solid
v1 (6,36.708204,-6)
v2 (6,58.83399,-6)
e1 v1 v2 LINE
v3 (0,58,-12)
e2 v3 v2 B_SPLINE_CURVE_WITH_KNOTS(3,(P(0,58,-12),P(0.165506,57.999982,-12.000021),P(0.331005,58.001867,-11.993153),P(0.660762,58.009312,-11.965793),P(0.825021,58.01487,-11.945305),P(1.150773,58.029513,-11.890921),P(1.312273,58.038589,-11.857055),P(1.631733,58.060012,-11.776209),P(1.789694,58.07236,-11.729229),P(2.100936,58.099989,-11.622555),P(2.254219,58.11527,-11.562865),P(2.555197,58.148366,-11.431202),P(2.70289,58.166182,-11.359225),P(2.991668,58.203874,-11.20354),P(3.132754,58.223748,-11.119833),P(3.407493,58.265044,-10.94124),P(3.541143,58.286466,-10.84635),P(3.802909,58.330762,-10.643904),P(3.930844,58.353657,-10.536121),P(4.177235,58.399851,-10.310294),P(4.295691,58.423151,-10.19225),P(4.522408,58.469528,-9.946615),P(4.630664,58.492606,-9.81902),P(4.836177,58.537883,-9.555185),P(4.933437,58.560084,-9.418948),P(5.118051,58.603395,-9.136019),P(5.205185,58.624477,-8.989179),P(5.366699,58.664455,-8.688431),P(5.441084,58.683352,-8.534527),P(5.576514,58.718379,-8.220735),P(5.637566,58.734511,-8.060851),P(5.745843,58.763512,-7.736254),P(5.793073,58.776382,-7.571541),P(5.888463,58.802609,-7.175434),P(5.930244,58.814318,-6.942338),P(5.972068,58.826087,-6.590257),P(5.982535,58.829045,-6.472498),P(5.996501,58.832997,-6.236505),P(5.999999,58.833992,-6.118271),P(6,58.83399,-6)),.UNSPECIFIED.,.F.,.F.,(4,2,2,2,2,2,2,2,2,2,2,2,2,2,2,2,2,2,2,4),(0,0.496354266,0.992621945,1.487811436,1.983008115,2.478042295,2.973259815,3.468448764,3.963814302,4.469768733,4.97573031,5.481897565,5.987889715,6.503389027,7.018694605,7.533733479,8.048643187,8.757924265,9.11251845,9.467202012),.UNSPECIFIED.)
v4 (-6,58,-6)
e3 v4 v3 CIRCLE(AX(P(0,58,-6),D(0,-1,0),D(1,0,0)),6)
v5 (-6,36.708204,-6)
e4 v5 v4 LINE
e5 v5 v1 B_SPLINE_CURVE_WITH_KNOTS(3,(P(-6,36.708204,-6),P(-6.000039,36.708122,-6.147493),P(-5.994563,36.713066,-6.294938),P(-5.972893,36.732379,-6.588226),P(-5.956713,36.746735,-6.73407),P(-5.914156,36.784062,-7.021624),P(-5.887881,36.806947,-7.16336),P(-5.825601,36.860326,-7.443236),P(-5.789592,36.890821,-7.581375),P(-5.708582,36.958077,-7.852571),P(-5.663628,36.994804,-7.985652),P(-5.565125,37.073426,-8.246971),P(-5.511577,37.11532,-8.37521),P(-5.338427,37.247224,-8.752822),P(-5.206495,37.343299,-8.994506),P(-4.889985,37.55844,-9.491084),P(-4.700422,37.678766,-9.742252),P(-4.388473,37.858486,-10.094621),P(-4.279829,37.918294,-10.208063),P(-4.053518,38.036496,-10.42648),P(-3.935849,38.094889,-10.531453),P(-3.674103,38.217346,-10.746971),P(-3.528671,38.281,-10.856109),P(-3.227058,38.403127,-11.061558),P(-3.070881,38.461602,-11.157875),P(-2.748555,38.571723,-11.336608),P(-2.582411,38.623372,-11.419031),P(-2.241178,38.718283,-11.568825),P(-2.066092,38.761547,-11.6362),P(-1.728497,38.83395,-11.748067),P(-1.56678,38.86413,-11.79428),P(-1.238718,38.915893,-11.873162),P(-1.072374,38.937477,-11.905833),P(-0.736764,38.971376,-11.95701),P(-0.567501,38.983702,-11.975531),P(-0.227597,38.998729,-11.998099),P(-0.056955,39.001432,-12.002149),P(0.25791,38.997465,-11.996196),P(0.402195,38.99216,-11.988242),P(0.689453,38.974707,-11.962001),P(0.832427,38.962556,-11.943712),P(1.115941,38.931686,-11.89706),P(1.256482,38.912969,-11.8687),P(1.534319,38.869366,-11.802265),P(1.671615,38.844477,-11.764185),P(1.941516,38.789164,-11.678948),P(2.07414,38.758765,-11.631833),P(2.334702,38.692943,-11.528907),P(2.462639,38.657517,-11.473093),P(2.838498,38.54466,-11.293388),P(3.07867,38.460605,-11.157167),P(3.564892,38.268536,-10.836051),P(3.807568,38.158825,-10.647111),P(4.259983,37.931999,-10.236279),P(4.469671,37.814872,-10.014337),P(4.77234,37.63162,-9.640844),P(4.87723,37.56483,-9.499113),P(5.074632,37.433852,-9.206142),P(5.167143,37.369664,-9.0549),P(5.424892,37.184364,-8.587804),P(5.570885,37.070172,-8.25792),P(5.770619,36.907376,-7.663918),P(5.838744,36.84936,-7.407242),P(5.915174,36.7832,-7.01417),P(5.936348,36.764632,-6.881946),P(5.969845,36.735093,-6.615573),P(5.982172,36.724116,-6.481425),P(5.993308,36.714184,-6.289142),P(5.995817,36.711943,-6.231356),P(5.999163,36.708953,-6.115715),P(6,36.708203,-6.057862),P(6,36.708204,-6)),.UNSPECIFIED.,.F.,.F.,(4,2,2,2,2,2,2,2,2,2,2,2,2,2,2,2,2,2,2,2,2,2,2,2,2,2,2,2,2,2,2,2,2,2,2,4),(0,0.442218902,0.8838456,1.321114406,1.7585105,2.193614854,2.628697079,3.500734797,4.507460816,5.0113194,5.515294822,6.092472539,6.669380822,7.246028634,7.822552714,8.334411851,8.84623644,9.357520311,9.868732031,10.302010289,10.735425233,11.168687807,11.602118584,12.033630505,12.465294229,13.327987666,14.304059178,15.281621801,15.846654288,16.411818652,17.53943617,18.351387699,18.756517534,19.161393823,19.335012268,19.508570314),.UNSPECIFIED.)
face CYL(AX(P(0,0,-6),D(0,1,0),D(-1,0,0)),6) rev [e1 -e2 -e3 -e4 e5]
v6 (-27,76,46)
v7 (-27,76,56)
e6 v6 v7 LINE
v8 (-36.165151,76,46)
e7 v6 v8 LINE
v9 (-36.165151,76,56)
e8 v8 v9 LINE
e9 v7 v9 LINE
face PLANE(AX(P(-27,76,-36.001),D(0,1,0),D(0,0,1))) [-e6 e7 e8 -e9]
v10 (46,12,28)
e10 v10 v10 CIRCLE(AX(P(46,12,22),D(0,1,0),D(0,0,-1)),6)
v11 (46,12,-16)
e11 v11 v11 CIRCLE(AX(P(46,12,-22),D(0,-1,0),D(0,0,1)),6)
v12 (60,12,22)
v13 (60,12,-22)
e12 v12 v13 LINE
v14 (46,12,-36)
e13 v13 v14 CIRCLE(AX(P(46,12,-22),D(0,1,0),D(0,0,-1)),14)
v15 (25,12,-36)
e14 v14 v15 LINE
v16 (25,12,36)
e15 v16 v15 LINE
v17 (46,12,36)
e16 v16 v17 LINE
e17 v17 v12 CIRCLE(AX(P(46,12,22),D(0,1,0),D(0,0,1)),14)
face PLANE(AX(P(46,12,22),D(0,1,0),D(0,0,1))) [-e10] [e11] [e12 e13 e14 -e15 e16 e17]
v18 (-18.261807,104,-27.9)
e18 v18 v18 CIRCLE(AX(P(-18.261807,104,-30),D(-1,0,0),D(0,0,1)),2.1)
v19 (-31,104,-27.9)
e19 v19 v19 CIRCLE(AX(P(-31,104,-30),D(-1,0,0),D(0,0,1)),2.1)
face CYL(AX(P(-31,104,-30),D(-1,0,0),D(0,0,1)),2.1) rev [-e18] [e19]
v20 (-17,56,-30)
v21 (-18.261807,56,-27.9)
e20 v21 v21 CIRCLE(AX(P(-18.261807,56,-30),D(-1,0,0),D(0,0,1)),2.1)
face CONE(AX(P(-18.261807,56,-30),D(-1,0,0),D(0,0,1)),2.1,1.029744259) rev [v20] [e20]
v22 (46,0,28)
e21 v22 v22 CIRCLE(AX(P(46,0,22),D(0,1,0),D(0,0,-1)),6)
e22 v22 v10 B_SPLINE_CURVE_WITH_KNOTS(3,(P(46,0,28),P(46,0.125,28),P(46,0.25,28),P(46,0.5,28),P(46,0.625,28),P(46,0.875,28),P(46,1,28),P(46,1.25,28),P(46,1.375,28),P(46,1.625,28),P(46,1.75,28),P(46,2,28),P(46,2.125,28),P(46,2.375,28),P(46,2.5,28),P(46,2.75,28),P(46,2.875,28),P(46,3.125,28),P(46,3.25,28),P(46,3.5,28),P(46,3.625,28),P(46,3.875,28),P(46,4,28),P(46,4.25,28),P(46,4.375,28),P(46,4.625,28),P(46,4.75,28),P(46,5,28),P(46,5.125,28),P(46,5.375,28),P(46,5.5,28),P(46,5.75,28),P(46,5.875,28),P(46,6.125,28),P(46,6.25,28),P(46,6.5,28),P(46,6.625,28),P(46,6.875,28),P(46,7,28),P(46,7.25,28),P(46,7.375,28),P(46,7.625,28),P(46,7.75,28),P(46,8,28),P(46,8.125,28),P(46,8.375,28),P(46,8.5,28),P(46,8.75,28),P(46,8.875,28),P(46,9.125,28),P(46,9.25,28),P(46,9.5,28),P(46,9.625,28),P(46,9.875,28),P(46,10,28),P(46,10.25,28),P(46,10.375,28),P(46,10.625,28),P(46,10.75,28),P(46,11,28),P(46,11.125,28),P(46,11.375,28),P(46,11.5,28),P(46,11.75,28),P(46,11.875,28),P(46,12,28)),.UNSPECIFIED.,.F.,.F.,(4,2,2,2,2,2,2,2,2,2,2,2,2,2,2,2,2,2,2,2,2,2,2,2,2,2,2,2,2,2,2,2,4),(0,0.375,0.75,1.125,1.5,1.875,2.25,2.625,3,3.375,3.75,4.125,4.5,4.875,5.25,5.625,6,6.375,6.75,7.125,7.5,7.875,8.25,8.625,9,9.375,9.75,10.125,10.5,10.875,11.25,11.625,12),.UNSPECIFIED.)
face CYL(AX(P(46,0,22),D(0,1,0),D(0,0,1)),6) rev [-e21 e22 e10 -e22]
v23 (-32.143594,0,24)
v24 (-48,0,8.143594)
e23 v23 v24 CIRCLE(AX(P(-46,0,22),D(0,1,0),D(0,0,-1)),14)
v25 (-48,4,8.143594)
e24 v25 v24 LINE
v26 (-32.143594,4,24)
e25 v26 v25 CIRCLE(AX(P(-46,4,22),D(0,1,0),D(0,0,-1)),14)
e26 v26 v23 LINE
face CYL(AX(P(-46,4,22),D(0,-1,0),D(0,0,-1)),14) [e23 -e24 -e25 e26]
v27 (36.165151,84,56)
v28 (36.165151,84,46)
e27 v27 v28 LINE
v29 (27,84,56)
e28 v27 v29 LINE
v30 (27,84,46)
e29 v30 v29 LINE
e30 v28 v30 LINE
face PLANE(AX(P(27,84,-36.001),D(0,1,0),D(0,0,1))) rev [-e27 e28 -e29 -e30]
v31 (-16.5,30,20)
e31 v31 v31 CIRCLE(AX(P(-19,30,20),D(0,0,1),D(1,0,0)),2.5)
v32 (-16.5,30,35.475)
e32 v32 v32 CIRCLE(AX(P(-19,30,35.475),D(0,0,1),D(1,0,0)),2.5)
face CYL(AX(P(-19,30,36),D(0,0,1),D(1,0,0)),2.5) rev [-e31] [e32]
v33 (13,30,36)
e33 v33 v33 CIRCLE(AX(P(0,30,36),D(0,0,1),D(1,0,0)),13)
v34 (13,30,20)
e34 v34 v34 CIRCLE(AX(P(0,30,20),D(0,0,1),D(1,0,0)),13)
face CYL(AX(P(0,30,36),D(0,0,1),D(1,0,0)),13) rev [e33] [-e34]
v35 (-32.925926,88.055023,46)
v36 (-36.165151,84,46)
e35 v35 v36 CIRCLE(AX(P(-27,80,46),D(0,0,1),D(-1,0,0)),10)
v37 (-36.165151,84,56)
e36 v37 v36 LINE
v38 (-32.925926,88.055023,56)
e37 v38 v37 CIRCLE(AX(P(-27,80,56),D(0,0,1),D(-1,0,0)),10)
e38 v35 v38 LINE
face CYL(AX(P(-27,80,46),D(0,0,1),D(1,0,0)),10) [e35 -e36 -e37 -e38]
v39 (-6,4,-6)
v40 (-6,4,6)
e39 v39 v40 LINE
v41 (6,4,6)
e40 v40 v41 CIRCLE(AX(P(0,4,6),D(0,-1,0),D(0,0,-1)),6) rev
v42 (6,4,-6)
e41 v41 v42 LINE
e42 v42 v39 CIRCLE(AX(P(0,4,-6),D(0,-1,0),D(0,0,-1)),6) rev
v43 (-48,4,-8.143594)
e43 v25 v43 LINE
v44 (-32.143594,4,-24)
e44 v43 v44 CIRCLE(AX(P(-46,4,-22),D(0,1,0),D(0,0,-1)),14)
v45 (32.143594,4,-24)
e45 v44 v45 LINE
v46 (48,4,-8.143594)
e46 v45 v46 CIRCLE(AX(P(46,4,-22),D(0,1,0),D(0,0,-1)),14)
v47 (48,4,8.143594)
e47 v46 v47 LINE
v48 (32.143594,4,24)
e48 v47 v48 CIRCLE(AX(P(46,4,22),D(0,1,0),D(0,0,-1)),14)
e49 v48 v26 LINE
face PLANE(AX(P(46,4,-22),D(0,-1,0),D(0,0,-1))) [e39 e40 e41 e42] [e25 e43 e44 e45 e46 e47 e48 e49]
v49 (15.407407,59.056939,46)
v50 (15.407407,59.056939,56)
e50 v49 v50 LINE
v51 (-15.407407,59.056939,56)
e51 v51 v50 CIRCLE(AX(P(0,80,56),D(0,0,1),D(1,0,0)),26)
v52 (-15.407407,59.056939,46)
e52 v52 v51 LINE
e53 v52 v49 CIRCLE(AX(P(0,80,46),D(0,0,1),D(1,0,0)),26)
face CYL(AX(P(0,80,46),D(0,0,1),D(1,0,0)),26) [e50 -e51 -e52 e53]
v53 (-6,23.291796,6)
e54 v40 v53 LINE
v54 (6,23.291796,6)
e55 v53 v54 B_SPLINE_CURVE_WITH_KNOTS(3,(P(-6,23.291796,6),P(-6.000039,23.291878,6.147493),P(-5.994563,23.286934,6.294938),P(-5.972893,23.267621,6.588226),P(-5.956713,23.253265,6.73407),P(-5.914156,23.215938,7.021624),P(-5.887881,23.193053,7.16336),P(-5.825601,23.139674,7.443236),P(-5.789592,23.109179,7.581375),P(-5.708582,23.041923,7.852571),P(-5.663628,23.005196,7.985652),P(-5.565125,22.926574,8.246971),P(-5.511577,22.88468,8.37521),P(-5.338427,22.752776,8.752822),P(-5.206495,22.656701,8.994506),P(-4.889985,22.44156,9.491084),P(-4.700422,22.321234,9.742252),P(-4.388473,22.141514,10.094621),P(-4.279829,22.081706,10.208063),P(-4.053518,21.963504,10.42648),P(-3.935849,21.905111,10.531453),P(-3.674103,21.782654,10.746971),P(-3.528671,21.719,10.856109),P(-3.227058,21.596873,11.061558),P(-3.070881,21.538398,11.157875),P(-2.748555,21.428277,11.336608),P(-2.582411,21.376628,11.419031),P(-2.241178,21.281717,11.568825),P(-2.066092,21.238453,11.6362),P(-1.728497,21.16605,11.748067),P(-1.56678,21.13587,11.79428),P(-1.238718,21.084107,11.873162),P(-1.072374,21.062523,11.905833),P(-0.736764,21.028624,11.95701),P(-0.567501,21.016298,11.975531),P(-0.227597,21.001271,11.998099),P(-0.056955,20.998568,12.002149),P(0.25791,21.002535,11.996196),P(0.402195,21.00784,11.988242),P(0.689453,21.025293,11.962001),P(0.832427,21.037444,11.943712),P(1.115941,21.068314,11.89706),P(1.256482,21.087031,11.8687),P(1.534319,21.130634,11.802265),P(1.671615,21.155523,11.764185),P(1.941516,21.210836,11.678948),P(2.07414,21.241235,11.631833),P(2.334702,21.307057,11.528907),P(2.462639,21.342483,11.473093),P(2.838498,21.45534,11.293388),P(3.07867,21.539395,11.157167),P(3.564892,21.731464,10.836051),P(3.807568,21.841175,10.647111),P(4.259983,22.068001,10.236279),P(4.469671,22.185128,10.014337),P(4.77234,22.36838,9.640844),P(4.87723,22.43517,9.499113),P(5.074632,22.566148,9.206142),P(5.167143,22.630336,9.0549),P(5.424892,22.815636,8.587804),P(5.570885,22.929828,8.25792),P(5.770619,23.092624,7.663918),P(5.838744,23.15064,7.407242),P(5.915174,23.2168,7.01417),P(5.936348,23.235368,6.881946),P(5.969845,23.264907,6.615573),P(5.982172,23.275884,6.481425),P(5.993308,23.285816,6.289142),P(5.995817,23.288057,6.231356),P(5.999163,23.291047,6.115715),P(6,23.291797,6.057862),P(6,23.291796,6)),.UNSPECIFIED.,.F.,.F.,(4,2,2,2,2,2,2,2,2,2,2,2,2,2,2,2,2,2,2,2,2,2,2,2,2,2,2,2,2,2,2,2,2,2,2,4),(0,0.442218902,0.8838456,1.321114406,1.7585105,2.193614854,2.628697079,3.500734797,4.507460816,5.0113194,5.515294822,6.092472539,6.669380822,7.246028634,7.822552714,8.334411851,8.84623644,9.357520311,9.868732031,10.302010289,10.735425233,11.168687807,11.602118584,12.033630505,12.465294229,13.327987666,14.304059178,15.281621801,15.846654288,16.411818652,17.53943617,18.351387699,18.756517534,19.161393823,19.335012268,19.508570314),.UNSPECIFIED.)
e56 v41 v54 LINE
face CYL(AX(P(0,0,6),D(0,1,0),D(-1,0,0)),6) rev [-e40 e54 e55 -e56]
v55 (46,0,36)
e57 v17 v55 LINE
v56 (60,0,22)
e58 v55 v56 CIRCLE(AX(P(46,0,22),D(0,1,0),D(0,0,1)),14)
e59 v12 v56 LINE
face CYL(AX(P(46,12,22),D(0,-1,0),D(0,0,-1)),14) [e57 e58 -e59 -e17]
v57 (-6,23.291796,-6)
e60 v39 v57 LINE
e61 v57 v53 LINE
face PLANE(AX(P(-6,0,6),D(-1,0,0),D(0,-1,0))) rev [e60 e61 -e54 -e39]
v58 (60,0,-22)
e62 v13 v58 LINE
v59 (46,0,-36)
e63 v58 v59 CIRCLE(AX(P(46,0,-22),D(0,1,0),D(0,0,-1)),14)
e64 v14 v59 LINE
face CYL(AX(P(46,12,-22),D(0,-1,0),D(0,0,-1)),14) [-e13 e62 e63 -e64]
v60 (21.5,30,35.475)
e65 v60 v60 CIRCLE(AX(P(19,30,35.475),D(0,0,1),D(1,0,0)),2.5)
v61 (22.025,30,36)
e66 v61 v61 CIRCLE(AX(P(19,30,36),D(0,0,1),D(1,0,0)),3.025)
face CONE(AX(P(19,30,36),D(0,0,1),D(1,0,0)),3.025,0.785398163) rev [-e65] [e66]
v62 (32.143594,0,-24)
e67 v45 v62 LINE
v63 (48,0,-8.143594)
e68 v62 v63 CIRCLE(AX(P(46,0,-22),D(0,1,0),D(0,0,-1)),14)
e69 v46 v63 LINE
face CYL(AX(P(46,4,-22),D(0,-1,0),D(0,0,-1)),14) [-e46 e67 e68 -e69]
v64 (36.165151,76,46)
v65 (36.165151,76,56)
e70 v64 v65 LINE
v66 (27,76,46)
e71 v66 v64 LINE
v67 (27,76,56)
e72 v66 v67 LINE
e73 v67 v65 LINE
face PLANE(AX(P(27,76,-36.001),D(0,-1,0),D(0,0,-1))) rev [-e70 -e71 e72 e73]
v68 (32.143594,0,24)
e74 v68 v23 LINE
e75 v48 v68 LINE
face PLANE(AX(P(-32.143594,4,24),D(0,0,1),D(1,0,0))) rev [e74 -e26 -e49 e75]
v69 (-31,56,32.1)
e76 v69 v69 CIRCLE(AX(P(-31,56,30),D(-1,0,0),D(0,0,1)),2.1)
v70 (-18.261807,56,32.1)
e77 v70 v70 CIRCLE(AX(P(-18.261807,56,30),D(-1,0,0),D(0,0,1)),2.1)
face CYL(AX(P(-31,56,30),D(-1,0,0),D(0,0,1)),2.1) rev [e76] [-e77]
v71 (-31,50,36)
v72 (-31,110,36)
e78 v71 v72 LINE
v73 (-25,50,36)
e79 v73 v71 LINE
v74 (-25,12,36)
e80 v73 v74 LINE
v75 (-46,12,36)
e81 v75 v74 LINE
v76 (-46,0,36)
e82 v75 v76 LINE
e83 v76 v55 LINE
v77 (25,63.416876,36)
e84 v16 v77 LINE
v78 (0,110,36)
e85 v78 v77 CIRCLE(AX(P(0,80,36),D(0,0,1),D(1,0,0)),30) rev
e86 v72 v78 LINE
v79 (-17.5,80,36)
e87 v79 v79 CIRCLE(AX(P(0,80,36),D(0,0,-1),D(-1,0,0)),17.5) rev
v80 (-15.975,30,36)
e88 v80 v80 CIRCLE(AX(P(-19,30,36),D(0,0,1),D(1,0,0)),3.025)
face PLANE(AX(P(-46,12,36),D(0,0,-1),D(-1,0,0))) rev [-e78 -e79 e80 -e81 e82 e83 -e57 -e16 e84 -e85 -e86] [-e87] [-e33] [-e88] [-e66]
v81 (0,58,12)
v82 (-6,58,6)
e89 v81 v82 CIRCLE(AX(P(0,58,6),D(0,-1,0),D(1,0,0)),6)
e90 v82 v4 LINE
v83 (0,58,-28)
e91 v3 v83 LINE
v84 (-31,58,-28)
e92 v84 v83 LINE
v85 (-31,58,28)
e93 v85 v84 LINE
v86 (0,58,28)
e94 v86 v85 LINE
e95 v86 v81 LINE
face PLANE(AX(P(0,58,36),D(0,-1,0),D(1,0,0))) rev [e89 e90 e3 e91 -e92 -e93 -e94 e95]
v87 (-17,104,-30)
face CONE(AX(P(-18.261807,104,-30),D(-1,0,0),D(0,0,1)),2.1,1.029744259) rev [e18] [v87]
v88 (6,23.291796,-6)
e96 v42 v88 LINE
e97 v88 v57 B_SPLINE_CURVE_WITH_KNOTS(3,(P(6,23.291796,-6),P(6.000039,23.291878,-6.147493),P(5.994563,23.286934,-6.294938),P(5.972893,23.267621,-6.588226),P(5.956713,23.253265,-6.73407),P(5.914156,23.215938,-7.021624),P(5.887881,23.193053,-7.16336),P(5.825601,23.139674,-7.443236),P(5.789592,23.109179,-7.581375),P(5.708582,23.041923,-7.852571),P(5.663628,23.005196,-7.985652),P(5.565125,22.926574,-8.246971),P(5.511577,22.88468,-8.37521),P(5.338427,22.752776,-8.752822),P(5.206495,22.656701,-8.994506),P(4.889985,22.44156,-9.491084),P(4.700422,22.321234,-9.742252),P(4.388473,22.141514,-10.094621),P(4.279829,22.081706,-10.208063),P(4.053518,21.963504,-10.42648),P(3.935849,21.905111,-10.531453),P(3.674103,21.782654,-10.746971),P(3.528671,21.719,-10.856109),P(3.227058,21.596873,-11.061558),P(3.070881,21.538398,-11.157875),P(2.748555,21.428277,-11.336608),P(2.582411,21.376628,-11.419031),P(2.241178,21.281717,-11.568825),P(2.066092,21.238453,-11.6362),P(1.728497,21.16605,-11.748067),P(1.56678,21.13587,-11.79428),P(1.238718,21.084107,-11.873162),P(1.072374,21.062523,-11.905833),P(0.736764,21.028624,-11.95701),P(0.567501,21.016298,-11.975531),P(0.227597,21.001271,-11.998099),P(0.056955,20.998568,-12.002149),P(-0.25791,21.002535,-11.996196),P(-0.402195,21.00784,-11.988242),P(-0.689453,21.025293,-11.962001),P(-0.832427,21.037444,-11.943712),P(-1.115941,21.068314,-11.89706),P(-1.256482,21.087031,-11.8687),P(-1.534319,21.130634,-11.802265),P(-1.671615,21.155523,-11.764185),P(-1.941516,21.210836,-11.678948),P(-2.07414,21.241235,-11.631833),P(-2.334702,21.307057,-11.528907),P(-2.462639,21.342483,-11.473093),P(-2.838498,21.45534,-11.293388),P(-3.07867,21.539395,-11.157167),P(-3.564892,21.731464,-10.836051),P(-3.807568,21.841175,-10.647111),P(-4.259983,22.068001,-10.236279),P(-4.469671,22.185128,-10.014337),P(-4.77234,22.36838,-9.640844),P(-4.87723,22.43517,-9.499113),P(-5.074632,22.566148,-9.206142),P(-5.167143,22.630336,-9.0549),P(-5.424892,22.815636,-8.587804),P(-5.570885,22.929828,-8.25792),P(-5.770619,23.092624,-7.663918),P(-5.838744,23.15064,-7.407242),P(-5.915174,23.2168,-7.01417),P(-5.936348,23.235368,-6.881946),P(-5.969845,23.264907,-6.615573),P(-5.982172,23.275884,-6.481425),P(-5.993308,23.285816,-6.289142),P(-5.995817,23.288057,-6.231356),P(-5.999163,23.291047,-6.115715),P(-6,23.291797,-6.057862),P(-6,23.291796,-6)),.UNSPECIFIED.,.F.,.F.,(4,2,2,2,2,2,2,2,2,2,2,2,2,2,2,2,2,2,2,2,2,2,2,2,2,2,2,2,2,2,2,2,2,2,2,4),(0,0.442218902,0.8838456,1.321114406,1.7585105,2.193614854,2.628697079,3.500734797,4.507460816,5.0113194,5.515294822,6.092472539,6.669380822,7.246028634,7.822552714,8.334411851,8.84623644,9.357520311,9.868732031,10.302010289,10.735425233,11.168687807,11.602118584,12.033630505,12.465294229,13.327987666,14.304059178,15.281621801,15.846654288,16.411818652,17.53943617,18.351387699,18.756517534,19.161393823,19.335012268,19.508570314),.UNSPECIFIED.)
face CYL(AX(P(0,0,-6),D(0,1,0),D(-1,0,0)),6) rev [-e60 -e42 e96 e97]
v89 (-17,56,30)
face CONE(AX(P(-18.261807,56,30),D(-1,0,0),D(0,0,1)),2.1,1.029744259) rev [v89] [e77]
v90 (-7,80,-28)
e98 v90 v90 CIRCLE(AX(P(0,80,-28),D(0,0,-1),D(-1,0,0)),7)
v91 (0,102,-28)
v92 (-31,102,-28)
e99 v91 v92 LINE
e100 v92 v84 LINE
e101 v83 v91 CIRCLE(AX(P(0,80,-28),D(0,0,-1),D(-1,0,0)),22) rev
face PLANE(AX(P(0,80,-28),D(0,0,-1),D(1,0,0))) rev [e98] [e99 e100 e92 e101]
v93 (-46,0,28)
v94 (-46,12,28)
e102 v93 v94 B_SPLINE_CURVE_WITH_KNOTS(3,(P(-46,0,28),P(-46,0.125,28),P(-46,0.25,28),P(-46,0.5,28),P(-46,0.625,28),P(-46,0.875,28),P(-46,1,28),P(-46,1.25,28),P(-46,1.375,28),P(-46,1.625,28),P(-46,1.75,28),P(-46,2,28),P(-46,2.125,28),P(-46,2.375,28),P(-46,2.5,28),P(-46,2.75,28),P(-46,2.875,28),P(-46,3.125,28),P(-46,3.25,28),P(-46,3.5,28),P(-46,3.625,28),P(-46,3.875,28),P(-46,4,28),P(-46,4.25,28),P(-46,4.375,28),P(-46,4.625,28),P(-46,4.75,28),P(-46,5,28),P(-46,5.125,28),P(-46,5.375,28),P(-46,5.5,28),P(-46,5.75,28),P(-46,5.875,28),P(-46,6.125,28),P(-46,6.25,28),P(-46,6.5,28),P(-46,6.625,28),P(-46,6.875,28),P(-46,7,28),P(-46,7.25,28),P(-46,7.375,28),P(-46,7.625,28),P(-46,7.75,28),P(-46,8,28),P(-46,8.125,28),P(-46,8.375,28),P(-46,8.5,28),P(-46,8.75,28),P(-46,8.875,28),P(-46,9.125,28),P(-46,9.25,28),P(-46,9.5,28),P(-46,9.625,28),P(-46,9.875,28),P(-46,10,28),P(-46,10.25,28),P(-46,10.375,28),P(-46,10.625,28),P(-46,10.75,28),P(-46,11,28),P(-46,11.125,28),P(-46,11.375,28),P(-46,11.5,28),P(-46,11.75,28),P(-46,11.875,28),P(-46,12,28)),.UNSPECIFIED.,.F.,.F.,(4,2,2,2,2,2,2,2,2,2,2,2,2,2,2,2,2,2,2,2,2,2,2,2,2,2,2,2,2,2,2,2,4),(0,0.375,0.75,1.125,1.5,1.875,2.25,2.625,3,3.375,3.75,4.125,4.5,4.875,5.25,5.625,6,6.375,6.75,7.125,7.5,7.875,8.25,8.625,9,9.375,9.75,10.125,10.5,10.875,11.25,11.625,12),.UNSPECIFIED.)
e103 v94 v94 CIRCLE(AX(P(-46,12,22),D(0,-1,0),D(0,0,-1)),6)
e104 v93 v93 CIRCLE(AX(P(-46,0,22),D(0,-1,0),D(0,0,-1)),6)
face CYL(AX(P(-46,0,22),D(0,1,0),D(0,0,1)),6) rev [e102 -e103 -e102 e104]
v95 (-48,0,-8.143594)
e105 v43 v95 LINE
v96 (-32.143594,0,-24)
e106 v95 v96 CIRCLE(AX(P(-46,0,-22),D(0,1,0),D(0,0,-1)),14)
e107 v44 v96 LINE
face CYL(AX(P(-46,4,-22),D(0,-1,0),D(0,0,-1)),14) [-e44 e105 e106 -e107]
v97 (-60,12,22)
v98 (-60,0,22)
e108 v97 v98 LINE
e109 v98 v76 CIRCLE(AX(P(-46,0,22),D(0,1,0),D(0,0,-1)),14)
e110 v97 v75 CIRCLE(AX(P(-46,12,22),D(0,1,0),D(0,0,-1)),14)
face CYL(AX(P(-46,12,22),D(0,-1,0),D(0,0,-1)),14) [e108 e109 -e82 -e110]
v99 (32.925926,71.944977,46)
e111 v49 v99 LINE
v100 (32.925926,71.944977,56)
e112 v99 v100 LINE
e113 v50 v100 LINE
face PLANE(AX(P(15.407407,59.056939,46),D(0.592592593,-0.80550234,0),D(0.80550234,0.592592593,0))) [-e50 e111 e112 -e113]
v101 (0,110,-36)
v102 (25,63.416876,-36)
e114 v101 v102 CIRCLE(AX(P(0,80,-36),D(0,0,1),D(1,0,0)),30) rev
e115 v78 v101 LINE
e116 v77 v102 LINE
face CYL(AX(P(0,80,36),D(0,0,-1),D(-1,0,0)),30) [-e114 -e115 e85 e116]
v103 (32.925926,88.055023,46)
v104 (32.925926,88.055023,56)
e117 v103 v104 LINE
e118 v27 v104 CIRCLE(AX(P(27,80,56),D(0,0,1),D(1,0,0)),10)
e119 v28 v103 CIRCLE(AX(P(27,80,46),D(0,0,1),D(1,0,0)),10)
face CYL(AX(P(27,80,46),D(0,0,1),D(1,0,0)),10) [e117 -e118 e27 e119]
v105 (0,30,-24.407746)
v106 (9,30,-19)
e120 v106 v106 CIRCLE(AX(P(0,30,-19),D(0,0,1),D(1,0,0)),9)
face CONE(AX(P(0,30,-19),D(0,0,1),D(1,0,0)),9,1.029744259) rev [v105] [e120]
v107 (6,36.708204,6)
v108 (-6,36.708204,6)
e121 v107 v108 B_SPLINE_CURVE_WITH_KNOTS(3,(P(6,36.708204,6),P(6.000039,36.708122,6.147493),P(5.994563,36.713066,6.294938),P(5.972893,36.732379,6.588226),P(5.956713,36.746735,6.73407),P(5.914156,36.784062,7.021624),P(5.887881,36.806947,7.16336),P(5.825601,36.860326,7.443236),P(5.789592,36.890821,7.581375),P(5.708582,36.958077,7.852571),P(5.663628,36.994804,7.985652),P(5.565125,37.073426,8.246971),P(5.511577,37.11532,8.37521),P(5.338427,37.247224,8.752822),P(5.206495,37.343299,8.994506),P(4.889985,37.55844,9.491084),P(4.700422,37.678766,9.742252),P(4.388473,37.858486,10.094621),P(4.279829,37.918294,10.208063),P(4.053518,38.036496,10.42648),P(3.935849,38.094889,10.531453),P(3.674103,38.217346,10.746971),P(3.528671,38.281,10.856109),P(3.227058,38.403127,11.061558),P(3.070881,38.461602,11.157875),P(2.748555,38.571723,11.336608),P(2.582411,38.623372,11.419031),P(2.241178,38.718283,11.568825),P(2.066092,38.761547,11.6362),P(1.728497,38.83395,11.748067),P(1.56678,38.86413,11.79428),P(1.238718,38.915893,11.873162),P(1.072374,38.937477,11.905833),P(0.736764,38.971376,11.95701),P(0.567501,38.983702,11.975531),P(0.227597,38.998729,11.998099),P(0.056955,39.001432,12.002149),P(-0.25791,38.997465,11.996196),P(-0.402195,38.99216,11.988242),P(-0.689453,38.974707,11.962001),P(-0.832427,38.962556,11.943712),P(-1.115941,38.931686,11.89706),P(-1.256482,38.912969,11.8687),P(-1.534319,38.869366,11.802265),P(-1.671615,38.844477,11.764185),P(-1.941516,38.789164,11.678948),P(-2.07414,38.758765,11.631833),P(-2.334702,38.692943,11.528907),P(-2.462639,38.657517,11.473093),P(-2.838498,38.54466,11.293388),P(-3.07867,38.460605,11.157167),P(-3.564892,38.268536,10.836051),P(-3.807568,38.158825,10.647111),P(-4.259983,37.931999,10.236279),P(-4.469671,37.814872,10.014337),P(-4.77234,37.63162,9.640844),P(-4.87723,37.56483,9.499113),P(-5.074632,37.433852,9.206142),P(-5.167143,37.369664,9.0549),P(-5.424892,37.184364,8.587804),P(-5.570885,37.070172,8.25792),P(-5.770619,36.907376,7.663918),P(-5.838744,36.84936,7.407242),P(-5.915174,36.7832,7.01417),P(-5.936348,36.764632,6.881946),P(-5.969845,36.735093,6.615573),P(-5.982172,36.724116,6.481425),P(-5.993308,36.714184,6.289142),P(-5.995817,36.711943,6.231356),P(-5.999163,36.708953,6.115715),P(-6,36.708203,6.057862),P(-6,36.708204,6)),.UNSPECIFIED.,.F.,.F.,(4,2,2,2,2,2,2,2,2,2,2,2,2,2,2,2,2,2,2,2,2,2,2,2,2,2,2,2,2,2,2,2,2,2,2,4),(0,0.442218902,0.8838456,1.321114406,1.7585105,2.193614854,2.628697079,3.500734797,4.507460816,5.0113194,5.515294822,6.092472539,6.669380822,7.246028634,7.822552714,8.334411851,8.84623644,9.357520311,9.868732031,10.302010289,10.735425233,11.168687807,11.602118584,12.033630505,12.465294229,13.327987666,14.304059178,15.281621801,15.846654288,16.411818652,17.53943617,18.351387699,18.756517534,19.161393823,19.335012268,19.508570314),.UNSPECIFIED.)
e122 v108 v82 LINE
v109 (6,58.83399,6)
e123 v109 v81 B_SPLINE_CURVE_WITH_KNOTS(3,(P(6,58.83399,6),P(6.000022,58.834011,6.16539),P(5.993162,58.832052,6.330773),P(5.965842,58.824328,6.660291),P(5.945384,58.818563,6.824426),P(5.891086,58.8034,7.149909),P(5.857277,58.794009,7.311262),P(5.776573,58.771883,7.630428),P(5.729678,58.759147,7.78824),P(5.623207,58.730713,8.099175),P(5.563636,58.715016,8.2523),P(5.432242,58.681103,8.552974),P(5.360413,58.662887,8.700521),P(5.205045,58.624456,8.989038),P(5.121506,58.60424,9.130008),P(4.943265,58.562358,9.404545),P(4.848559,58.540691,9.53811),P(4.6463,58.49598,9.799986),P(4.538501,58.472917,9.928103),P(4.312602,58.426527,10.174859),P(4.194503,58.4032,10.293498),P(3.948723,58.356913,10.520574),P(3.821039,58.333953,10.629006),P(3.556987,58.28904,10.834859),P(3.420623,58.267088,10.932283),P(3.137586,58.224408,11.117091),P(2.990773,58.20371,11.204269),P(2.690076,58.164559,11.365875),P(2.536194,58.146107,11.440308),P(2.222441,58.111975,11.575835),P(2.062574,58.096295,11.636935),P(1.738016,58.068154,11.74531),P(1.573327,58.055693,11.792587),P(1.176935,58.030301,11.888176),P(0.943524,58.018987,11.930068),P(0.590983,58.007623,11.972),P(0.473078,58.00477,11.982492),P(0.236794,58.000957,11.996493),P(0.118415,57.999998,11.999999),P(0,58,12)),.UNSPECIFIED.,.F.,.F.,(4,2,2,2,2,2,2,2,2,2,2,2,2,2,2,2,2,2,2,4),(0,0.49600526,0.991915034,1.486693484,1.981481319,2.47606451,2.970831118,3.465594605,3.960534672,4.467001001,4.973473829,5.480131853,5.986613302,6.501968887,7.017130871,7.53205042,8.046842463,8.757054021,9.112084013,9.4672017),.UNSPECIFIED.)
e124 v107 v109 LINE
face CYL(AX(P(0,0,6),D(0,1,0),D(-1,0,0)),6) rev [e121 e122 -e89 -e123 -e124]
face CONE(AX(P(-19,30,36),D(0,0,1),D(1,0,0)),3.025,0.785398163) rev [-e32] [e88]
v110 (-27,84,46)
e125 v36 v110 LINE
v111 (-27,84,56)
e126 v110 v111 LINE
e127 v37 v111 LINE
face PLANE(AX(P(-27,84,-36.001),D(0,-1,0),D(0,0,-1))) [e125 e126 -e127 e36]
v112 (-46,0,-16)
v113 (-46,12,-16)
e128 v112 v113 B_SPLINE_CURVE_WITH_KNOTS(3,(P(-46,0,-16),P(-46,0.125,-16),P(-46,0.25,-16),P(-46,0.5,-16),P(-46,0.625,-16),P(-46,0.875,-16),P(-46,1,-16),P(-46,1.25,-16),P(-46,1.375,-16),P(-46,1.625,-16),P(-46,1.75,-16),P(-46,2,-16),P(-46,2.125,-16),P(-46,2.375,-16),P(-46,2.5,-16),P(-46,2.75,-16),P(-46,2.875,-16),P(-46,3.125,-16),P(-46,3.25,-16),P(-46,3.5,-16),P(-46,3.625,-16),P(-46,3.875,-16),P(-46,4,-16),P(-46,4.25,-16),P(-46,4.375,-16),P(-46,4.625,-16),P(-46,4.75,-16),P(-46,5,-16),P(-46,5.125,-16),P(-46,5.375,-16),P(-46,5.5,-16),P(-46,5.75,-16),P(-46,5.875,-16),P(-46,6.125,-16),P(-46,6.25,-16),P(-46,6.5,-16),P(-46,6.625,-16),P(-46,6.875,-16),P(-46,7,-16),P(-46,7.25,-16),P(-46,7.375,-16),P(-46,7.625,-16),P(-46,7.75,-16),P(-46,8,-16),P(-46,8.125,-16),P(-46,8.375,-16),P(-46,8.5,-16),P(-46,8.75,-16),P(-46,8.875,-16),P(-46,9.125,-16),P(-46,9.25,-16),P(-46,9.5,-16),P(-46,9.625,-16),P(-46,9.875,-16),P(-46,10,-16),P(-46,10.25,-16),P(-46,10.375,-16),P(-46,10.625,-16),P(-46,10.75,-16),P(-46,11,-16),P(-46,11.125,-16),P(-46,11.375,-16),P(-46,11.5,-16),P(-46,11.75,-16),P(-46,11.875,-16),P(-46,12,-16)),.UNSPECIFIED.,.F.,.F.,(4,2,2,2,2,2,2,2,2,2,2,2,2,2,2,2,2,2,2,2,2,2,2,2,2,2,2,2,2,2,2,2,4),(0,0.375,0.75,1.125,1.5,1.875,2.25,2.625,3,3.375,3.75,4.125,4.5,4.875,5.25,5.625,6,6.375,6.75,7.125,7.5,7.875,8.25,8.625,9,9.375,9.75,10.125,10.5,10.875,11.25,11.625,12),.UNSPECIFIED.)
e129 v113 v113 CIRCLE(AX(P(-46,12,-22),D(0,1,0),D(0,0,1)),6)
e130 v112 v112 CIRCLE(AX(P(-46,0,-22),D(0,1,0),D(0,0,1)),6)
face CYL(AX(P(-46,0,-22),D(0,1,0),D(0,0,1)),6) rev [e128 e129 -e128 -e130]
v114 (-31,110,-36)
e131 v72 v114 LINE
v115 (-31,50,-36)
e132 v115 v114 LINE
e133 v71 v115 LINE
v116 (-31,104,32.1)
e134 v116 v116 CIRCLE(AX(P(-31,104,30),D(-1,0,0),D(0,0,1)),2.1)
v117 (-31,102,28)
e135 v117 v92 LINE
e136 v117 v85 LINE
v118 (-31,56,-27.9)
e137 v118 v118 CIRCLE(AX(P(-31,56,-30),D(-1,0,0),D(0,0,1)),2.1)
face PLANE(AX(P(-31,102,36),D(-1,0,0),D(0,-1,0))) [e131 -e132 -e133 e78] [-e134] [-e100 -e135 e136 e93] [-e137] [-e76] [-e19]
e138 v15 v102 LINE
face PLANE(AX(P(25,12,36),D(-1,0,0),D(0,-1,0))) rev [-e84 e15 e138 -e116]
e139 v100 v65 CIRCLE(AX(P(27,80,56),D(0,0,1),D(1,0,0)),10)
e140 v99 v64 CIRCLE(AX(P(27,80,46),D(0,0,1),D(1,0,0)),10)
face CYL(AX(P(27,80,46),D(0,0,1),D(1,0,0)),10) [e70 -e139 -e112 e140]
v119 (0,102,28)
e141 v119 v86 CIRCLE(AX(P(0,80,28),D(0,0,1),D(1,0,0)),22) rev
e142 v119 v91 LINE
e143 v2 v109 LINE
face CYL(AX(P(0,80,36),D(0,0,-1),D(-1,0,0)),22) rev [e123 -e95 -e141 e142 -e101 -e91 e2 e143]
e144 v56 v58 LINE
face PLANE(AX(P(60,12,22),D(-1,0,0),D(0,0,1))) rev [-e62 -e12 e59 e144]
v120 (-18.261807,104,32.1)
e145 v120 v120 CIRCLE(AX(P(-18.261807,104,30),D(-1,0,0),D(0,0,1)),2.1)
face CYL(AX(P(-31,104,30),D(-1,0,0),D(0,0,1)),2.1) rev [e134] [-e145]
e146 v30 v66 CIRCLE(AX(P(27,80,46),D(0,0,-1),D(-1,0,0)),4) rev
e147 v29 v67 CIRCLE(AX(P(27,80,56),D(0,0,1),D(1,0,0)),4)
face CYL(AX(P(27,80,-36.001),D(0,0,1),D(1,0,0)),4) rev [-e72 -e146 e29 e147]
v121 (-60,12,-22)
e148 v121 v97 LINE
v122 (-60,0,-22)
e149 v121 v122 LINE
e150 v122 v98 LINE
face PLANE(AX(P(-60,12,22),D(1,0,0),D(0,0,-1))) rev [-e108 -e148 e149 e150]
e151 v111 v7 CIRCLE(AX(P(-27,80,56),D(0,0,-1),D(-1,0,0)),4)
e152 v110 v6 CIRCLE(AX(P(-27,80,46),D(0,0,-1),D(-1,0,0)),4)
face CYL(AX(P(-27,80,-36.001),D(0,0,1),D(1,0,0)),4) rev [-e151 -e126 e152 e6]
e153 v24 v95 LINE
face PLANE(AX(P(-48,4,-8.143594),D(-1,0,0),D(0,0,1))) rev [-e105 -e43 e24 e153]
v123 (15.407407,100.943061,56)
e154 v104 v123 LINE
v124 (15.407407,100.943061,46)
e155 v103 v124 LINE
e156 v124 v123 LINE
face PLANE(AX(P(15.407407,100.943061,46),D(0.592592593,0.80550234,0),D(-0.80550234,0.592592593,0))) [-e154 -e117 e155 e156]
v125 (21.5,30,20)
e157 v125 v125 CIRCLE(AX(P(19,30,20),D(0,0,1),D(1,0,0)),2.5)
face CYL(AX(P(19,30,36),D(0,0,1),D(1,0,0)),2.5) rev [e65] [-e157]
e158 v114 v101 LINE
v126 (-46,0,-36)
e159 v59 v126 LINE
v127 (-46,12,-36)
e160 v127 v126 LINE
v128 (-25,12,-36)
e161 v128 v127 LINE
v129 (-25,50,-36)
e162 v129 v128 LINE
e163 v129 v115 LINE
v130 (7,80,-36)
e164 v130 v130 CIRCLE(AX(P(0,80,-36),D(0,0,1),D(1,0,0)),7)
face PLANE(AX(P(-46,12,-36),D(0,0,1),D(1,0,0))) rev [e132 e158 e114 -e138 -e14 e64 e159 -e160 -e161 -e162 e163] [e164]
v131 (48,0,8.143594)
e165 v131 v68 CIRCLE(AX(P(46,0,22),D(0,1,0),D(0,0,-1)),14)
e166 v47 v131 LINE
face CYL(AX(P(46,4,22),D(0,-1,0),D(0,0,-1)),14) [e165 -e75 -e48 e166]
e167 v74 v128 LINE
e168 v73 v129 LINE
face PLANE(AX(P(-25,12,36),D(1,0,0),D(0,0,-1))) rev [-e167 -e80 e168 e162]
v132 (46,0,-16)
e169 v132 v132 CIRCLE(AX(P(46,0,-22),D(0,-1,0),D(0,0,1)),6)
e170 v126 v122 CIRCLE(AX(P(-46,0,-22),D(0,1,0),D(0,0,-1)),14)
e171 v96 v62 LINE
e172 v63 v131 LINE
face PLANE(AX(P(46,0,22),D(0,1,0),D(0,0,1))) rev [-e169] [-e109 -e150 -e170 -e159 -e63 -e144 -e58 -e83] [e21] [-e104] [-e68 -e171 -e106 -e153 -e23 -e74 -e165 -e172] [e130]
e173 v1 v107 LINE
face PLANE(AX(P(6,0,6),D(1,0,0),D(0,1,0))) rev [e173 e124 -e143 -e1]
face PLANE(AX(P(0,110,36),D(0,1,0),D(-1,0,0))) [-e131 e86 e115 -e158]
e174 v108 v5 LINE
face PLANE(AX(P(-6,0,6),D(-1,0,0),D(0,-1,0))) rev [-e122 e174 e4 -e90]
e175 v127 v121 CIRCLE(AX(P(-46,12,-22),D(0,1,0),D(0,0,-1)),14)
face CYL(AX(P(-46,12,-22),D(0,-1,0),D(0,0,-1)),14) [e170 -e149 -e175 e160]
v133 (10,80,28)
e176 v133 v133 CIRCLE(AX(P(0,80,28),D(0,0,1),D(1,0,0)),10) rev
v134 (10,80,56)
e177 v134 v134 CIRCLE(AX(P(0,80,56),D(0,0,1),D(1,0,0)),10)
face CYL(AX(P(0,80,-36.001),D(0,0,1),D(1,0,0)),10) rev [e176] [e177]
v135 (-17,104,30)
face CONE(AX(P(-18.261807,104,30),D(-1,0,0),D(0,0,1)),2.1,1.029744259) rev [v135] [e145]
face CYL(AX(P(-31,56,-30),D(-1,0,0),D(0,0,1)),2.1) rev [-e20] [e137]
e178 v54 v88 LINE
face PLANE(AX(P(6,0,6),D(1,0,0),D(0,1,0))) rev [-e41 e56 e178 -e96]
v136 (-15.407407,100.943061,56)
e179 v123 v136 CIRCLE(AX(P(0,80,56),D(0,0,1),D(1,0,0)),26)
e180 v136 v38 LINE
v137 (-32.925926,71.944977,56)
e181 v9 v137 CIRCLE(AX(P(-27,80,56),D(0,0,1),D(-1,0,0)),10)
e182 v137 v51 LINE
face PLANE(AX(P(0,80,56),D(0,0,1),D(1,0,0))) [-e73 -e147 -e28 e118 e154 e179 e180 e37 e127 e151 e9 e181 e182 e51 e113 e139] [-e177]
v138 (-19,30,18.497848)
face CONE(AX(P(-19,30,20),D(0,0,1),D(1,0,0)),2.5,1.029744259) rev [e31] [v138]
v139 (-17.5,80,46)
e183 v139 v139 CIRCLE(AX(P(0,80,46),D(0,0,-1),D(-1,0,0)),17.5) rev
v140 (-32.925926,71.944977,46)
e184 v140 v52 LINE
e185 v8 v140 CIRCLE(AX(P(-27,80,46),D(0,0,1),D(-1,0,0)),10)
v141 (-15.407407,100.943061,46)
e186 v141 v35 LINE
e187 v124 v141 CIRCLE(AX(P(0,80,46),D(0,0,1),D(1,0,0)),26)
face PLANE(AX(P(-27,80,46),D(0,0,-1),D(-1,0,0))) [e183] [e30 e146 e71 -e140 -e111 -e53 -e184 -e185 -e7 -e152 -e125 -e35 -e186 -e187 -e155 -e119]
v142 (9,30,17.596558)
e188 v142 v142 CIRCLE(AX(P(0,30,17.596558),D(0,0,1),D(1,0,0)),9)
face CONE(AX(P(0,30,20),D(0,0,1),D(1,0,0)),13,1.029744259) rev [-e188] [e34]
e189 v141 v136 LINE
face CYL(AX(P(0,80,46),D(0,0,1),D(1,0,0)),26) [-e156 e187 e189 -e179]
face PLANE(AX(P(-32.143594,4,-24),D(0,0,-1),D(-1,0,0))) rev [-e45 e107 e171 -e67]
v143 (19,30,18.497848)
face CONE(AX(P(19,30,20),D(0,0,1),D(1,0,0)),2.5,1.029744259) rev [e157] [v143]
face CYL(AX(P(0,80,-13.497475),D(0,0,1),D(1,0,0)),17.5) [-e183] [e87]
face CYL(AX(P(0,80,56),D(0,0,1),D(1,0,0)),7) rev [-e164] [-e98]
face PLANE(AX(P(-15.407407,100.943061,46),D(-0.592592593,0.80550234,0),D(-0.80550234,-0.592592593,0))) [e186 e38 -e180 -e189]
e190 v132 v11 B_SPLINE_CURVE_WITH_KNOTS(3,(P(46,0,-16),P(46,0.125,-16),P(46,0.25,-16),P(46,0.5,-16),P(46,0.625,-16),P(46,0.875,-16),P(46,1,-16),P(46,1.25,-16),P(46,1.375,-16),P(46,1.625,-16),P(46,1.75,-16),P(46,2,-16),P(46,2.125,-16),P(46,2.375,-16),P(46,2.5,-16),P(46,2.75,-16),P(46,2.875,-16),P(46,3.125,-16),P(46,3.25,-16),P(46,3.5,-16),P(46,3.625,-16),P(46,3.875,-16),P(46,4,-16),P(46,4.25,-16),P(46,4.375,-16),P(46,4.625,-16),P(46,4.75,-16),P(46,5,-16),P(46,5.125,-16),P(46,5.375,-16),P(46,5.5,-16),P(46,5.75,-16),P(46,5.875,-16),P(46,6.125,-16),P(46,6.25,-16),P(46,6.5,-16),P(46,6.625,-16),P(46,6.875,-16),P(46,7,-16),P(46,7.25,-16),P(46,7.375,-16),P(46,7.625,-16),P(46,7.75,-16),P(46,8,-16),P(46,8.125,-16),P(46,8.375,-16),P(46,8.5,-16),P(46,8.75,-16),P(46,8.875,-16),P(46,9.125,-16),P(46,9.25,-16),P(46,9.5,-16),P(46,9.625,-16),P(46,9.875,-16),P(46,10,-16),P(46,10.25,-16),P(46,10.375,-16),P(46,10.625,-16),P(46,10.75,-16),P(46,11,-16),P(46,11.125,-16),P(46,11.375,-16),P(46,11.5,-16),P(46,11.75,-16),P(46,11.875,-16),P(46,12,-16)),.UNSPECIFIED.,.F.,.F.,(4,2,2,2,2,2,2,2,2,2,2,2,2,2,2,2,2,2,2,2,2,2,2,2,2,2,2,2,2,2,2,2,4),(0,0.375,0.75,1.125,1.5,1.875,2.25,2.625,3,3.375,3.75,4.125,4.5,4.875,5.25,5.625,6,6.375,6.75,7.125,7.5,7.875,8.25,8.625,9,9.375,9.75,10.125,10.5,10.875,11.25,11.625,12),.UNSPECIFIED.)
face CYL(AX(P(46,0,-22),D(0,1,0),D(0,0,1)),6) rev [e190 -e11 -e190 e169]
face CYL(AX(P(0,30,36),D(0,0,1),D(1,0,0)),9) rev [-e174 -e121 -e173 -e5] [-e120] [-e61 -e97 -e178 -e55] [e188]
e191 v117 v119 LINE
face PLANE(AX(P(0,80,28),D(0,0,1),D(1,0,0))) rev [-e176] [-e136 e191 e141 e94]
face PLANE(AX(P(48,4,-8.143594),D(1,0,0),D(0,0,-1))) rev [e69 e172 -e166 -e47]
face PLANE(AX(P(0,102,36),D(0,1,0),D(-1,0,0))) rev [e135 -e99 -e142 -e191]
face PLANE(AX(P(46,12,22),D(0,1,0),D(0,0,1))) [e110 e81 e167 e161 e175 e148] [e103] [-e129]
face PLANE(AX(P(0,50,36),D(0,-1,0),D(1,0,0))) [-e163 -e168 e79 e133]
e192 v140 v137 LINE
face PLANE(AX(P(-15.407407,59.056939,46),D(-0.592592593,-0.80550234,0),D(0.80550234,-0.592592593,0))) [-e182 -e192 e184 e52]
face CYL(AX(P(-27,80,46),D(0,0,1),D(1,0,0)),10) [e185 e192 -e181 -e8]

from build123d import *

# Parameters (mm, degrees)
EXTRUDE_1_DEPTH                            = 12
EXTRUDE_1_2_DEPTH                          = 36
EXTRUDE_2_DEPTH                            = 8
EXTRUDE_3_DEPTH                            = 36
EXTRUDE_START                              = 56
EXTRUDE_4_DEPTH                            = 10
SKETCH_6_R                                 = 17.5
EXTRUDE_5_DEPTH                            = 20
CUT_EXTRUDE_1_REACH                        = 157.448
SKETCH_7_R                                 = 10
CUT_EXTRUDE_2_REACH                        = 157.448
HOLE_WIZARD_M16_1_D                        = 14
CUT_EXTRUDE_START                          = 10
CUT_EXTRUDE_3_DEPTH                        = 111.498756211
SKETCH_20_R                                = 6
CUT_EXTRUDE_4_DEPTH                        = 128.82800945
MIRROR_4_AT_THE_SECOND_PLANE_COPY_1_SKET_R = 6
MIRROR_4_AT_THE_SECOND_PLANE_COPY_1_DEPTH  = 128.82800945
CUT_EXTRUDE_5_DEPTH                        = 4


# Read off the part's stored shape, not the designer's step: M5 螺纹孔1
with BuildPart() as part:
    # 草图1 → Extrude 1 (new body)
    with BuildSketch(Plane(origin=(0, 0, 0), x_dir=(1, 0, 0), z_dir=(0, 1, 0))):
        with BuildLine():
            Line((-46, -36), (46, -36))
            ThreePointArc((46, -36), (55.899494937, -31.899494937), (60, -22))
            Line((60, -22), (60, 22))
            ThreePointArc((60, 22), (55.899494937, 31.899494937), (46, 36))
            Line((46, 36), (-46, 36))
            ThreePointArc((-46, 36), (-55.899494937, 31.899494937), (-60, 22))
            Line((-60, 22), (-60, -22))
            ThreePointArc((-60, -22), (-55.899494937, -31.899494937), (-46, -36))
        make_face()
    extrude(amount=EXTRUDE_1_DEPTH)



with BuildPart() as body_2:
    # 草图2 → Extrude 1 2 (new, symmetric)
    with BuildSketch(Plane.XY):
        with BuildLine():
            Line((-31, 102), (0, 102))
            ThreePointArc((0, 102), (22, 80), (0, 58))
            Line((0, 58), (-31, 58))
            Line((-31, 58), (-31, 50))
            Line((-31, 50), (0, 50))
            ThreePointArc((0, 50), (30, 80), (0, 110))
            Line((0, 110), (-31, 110))
            Line((-31, 110), (-31, 102))
        make_face()
    extrude(amount=EXTRUDE_1_2_DEPTH, both=True)

    # 草图3 → 凸台-拉伸2 (add)
    with BuildSketch(Plane.XY.offset(36)):
        with BuildLine():
            Line((-31, 110), (-31, 50))
            Line((-31, 50), (0, 50))
            ThreePointArc((0, 50), (30, 80), (0, 110))
            Line((0, 110), (-31, 110))
        make_face()
    extrude_2 = extrude(amount=-EXTRUDE_2_DEPTH)

    # 镜向1: 凸台-拉伸2 across plane
    add(extrude_2.mirror(Plane.XY))


with BuildPart() as part_1:
    add(part.part)

    add(body_2.part)  # 凸台-拉伸3 merges body 2
    # 草图4 → 凸台-拉伸3 (add, symmetric)
    with BuildSketch(Plane.XY):
        with BuildLine():
            Line((-25, 12), (-25, 50))
            Line((-25, 50), (0, 50))
            ThreePointArc((0, 50), (14.186371655, 53.566179631), (25, 63.416876048))
            Line((25, 63.416876048), (25, 12))
            Line((25, 12), (-25, 12))
        make_face()
    extrude(amount=EXTRUDE_3_DEPTH, both=True)



with BuildPart() as body_2_2:
    # 草图5 → 凸台-拉伸4 (new body)
    with BuildSketch(Plane.XY.offset(EXTRUDE_START)):
        with BuildLine():
            Line((15.407407407, 100.943060831), (32.925925926, 88.055023397))
            ThreePointArc((32.925925926, 88.055023397), (37, 80), (32.925925926, 71.944976603))
            Line((32.925925926, 71.944976603), (15.407407407, 59.056939169))
            ThreePointArc((15.407407407, 59.056939169), (0, 54), (-15.407407407, 59.056939169))
            Line((-15.407407407, 59.056939169), (-32.925925926, 71.944976603))
            ThreePointArc((-32.925925926, 71.944976603), (-37, 80), (-32.925925926, 88.055023397))
            Line((-32.925925926, 88.055023397), (-15.407407407, 100.943060831))
            ThreePointArc((-15.407407407, 100.943060831), (0, 106), (15.407407407, 100.943060831))
        make_face()
    extrude(amount=-EXTRUDE_4_DEPTH)


with BuildPart() as part_2:
    add(part_1.part)

    add(body_2_2.part)  # 凸台-拉伸5 merges body 2 2
    # 草图6 → 凸台-拉伸5 (add)
    with BuildSketch(Plane.XY.offset(56)):
        with Locations(Location((0, 80, 0), (0, 0, 180))):
            Circle(SKETCH_6_R)
    extrude(amount=-EXTRUDE_5_DEPTH)

    # 草图7 → 切除-拉伸1 (cut, up to next)
    with BuildSketch(Plane.XY.offset(56), mode=Mode.PRIVATE) as cut_extrude_1_sk1:
        with Locations((0, 80)):
            Circle(SKETCH_7_R)
    cut_extrude_1_tool1 = extrude(cut_extrude_1_sk1.sketch, amount=-CUT_EXTRUDE_1_REACH, mode=Mode.PRIVATE) & part_2.part
    add(cut_extrude_1_tool1.solids().sort_by_distance((0, 80, 56))[0], mode=Mode.SUBTRACT)

    # 草图8 → 切除-拉伸2 (cut, up to next)
    with BuildSketch(Plane.XY.offset(56), mode=Mode.PRIVATE) as cut_extrude_2_sk1:
        with BuildLine():
            Line((27, 84), (48.849510695, 84))
            ThreePointArc((48.849510695, 84), (52.849510695, 80), (48.849510695, 76))
            Line((48.849510695, 76), (27, 76))
            ThreePointArc((27, 76), (23, 80), (27, 84))
        make_face()
    cut_extrude_2_tool1 = extrude(cut_extrude_2_sk1.sketch, amount=-CUT_EXTRUDE_2_REACH, mode=Mode.PRIVATE) & part_2.part
    cut_extrude_2 = cut_extrude_2_tool1.solids().sort_by_distance((37.924755, 80, 56))[0]
    add(cut_extrude_2, mode=Mode.SUBTRACT)

    # 镜向2: 切除-拉伸2 across plane
    add(cut_extrude_2.mirror(Plane(origin=(0, 0, 0), x_dir=(0, 0, 1), z_dir=(1, 0, 0))), mode=Mode.SUBTRACT)

    # M16 螺纹孔1 (through all)
    with Locations(Plane.XY.offset(56)):
        with Locations((0, 80)):
            Hole(HOLE_WIZARD_M16_1_D / 2)

    # M5 螺纹孔1 outline → M5 螺纹孔1 (revolve, cut)
    with BuildSketch(Plane(origin=(0, 56, 30), x_dir=(0, 1, 0), z_dir=(0, 0, -1))):
        Polygon((2.1, -18.2618073), (0, -17), (0, -31), (2.1, -31), align=None)
    revolve(axis=Axis((0, 56, 30), (1, 0, 0)), mode=Mode.SUBTRACT)

    # Hole Wizard M5 _1 2 outline → Hole Wizard M5 _1 2 (revolve, cut)
    with BuildSketch(Plane(origin=(0, 104, -30), x_dir=(0, 1, 0), z_dir=(0, 0, -1))):
        Polygon((2.1, -18.2618073), (0, -17), (0, -31), (2.1, -31), align=None)
    revolve(axis=Axis((0, 104, -30), (1, 0, 0)), mode=Mode.SUBTRACT)

    # Hole Wizard M5 _1 3 outline → Hole Wizard M5 _1 3 (revolve, cut)
    with BuildSketch(Plane(origin=(0, 56, -30), x_dir=(0, 1, 0), z_dir=(0, 0, -1))):
        Polygon((2.1, -18.2618073), (0, -17), (0, -31), (2.1, -31), align=None)
    revolve(axis=Axis((0, 56, -30), (1, 0, 0)), mode=Mode.SUBTRACT)

    # Hole Wizard M5 _1 4 outline → Hole Wizard M5 _1 4 (revolve, cut)
    with BuildSketch(Plane(origin=(0, 104, 30), x_dir=(0, 1, 0), z_dir=(0, 0, -1))):
        Polygon((2.1, -18.2618073), (0, -17), (0, -31), (2.1, -31), align=None)
    revolve(axis=Axis((0, 104, 30), (1, 0, 0)), mode=Mode.SUBTRACT)

    # 草图15 → 切除-拉伸3 (cut, through all)
    with BuildSketch(Plane(origin=(0, 58, 0), x_dir=(1, 0, 0), z_dir=(0, 1, 0)).offset(CUT_EXTRUDE_START)):
        with BuildLine():
            Line((-6, -6), (-6, 6))
            ThreePointArc((-6, 6), (0, 12), (6, 6))
            Line((6, 6), (6, -6))
            ThreePointArc((6, -6), (0, -12), (-6, -6))
        make_face()
    extrude(amount=-CUT_EXTRUDE_3_DEPTH, mode=Mode.SUBTRACT)

    # 草图17 → 孔1 (revolve, cut)
    with BuildSketch(Plane(origin=(0, 30, 36), x_dir=(0, -1, 0), z_dir=(1, 0, 0))):
        Polygon((0, 0), (0, 60.407745571), (9, 55), (9, 18.403442476), (13, 16), (13, 0), align=None)
    revolve(axis=Axis((0, 30, 42.130023899), (0, 0, -1)), mode=Mode.SUBTRACT)

    # 草图19 → M6 螺纹孔1 (revolve, cut)
    with BuildSketch(Plane(origin=(-19, 30, 36), x_dir=(0, -1, 0), z_dir=(1, 0, 0))):
        Polygon((0, 0), (0, 17.502151548), (2.5, 16), (2.5, 0.525), (3.025, 0), align=None)
    hole_wizard_m6_1 = revolve(axis=Axis((-19, 30, 42.35), (0, 0, -1)), mode=Mode.SUBTRACT)

    # 镜向3: M6 螺纹孔1 across plane
    add(hole_wizard_m6_1.mirror(Plane(origin=(0, 0, 0), x_dir=(0, 0, 1), z_dir=(1, 0, 0))), mode=Mode.SUBTRACT)

    # 草图20 → 切除-拉伸4 (cut, through all)
    with BuildSketch(Plane(origin=(0, 12, 0), x_dir=(1, 0, 0), z_dir=(0, 1, 0))):
        with Locations(Location((-46, 22, 0), (0, 0, 270))):
            Circle(SKETCH_20_R)
    cut_extrude_4 = extrude(amount=-CUT_EXTRUDE_4_DEPTH, mode=Mode.SUBTRACT)

    # 镜向4: 切除-拉伸4 across plane
    add(cut_extrude_4.mirror(Plane(origin=(0, 0, 0), x_dir=(0, 0, 1), z_dir=(1, 0, 0))), mode=Mode.SUBTRACT)

    # 镜向4 at the second plane: 切除-拉伸4 across plane
    add(cut_extrude_4.mirror(Plane.XY), mode=Mode.SUBTRACT)

    # 镜向4 at the second plane copy 1 sket → 镜向4 at the second plane copy 1 (cut, through all)
    with BuildSketch(Plane(origin=(0, 12, 0), x_dir=(-1, 0, 0), z_dir=(0, 1, 0))):
        with Locations(Location((-46, 22, 0), (0, 0, 270))):
            Circle(MIRROR_4_AT_THE_SECOND_PLANE_COPY_1_SKET_R)
    extrude(amount=-MIRROR_4_AT_THE_SECOND_PLANE_COPY_1_DEPTH, mode=Mode.SUBTRACT)

    # 草图21 → 切除-拉伸5 (cut)
    with BuildSketch(Plane.XZ):
        with BuildLine():
            Line((-32.143593539, -24), (32.143593539, -24))
            ThreePointArc((32.143593539, -24), (36.100505063, -12.100505063), (48, -8.143593539))
            Line((48, -8.143593539), (48, 8.143593539))
            ThreePointArc((48, 8.143593539), (36.100505063, 12.100505063), (32.143593539, 24))
            Line((32.143593539, 24), (-32.143593539, 24))
            ThreePointArc((-32.143593539, 24), (-36.100505063, 12.100505063), (-48, 8.143593539))
            Line((-48, 8.143593539), (-48, -8.143593539))
            ThreePointArc((-48, -8.143593539), (-36.100505063, -12.100505063), (-32.143593539, -24))
        make_face()
    extrude(amount=-CUT_EXTRUDE_5_DEPTH, mode=Mode.SUBTRACT)


solid = part_2.part
